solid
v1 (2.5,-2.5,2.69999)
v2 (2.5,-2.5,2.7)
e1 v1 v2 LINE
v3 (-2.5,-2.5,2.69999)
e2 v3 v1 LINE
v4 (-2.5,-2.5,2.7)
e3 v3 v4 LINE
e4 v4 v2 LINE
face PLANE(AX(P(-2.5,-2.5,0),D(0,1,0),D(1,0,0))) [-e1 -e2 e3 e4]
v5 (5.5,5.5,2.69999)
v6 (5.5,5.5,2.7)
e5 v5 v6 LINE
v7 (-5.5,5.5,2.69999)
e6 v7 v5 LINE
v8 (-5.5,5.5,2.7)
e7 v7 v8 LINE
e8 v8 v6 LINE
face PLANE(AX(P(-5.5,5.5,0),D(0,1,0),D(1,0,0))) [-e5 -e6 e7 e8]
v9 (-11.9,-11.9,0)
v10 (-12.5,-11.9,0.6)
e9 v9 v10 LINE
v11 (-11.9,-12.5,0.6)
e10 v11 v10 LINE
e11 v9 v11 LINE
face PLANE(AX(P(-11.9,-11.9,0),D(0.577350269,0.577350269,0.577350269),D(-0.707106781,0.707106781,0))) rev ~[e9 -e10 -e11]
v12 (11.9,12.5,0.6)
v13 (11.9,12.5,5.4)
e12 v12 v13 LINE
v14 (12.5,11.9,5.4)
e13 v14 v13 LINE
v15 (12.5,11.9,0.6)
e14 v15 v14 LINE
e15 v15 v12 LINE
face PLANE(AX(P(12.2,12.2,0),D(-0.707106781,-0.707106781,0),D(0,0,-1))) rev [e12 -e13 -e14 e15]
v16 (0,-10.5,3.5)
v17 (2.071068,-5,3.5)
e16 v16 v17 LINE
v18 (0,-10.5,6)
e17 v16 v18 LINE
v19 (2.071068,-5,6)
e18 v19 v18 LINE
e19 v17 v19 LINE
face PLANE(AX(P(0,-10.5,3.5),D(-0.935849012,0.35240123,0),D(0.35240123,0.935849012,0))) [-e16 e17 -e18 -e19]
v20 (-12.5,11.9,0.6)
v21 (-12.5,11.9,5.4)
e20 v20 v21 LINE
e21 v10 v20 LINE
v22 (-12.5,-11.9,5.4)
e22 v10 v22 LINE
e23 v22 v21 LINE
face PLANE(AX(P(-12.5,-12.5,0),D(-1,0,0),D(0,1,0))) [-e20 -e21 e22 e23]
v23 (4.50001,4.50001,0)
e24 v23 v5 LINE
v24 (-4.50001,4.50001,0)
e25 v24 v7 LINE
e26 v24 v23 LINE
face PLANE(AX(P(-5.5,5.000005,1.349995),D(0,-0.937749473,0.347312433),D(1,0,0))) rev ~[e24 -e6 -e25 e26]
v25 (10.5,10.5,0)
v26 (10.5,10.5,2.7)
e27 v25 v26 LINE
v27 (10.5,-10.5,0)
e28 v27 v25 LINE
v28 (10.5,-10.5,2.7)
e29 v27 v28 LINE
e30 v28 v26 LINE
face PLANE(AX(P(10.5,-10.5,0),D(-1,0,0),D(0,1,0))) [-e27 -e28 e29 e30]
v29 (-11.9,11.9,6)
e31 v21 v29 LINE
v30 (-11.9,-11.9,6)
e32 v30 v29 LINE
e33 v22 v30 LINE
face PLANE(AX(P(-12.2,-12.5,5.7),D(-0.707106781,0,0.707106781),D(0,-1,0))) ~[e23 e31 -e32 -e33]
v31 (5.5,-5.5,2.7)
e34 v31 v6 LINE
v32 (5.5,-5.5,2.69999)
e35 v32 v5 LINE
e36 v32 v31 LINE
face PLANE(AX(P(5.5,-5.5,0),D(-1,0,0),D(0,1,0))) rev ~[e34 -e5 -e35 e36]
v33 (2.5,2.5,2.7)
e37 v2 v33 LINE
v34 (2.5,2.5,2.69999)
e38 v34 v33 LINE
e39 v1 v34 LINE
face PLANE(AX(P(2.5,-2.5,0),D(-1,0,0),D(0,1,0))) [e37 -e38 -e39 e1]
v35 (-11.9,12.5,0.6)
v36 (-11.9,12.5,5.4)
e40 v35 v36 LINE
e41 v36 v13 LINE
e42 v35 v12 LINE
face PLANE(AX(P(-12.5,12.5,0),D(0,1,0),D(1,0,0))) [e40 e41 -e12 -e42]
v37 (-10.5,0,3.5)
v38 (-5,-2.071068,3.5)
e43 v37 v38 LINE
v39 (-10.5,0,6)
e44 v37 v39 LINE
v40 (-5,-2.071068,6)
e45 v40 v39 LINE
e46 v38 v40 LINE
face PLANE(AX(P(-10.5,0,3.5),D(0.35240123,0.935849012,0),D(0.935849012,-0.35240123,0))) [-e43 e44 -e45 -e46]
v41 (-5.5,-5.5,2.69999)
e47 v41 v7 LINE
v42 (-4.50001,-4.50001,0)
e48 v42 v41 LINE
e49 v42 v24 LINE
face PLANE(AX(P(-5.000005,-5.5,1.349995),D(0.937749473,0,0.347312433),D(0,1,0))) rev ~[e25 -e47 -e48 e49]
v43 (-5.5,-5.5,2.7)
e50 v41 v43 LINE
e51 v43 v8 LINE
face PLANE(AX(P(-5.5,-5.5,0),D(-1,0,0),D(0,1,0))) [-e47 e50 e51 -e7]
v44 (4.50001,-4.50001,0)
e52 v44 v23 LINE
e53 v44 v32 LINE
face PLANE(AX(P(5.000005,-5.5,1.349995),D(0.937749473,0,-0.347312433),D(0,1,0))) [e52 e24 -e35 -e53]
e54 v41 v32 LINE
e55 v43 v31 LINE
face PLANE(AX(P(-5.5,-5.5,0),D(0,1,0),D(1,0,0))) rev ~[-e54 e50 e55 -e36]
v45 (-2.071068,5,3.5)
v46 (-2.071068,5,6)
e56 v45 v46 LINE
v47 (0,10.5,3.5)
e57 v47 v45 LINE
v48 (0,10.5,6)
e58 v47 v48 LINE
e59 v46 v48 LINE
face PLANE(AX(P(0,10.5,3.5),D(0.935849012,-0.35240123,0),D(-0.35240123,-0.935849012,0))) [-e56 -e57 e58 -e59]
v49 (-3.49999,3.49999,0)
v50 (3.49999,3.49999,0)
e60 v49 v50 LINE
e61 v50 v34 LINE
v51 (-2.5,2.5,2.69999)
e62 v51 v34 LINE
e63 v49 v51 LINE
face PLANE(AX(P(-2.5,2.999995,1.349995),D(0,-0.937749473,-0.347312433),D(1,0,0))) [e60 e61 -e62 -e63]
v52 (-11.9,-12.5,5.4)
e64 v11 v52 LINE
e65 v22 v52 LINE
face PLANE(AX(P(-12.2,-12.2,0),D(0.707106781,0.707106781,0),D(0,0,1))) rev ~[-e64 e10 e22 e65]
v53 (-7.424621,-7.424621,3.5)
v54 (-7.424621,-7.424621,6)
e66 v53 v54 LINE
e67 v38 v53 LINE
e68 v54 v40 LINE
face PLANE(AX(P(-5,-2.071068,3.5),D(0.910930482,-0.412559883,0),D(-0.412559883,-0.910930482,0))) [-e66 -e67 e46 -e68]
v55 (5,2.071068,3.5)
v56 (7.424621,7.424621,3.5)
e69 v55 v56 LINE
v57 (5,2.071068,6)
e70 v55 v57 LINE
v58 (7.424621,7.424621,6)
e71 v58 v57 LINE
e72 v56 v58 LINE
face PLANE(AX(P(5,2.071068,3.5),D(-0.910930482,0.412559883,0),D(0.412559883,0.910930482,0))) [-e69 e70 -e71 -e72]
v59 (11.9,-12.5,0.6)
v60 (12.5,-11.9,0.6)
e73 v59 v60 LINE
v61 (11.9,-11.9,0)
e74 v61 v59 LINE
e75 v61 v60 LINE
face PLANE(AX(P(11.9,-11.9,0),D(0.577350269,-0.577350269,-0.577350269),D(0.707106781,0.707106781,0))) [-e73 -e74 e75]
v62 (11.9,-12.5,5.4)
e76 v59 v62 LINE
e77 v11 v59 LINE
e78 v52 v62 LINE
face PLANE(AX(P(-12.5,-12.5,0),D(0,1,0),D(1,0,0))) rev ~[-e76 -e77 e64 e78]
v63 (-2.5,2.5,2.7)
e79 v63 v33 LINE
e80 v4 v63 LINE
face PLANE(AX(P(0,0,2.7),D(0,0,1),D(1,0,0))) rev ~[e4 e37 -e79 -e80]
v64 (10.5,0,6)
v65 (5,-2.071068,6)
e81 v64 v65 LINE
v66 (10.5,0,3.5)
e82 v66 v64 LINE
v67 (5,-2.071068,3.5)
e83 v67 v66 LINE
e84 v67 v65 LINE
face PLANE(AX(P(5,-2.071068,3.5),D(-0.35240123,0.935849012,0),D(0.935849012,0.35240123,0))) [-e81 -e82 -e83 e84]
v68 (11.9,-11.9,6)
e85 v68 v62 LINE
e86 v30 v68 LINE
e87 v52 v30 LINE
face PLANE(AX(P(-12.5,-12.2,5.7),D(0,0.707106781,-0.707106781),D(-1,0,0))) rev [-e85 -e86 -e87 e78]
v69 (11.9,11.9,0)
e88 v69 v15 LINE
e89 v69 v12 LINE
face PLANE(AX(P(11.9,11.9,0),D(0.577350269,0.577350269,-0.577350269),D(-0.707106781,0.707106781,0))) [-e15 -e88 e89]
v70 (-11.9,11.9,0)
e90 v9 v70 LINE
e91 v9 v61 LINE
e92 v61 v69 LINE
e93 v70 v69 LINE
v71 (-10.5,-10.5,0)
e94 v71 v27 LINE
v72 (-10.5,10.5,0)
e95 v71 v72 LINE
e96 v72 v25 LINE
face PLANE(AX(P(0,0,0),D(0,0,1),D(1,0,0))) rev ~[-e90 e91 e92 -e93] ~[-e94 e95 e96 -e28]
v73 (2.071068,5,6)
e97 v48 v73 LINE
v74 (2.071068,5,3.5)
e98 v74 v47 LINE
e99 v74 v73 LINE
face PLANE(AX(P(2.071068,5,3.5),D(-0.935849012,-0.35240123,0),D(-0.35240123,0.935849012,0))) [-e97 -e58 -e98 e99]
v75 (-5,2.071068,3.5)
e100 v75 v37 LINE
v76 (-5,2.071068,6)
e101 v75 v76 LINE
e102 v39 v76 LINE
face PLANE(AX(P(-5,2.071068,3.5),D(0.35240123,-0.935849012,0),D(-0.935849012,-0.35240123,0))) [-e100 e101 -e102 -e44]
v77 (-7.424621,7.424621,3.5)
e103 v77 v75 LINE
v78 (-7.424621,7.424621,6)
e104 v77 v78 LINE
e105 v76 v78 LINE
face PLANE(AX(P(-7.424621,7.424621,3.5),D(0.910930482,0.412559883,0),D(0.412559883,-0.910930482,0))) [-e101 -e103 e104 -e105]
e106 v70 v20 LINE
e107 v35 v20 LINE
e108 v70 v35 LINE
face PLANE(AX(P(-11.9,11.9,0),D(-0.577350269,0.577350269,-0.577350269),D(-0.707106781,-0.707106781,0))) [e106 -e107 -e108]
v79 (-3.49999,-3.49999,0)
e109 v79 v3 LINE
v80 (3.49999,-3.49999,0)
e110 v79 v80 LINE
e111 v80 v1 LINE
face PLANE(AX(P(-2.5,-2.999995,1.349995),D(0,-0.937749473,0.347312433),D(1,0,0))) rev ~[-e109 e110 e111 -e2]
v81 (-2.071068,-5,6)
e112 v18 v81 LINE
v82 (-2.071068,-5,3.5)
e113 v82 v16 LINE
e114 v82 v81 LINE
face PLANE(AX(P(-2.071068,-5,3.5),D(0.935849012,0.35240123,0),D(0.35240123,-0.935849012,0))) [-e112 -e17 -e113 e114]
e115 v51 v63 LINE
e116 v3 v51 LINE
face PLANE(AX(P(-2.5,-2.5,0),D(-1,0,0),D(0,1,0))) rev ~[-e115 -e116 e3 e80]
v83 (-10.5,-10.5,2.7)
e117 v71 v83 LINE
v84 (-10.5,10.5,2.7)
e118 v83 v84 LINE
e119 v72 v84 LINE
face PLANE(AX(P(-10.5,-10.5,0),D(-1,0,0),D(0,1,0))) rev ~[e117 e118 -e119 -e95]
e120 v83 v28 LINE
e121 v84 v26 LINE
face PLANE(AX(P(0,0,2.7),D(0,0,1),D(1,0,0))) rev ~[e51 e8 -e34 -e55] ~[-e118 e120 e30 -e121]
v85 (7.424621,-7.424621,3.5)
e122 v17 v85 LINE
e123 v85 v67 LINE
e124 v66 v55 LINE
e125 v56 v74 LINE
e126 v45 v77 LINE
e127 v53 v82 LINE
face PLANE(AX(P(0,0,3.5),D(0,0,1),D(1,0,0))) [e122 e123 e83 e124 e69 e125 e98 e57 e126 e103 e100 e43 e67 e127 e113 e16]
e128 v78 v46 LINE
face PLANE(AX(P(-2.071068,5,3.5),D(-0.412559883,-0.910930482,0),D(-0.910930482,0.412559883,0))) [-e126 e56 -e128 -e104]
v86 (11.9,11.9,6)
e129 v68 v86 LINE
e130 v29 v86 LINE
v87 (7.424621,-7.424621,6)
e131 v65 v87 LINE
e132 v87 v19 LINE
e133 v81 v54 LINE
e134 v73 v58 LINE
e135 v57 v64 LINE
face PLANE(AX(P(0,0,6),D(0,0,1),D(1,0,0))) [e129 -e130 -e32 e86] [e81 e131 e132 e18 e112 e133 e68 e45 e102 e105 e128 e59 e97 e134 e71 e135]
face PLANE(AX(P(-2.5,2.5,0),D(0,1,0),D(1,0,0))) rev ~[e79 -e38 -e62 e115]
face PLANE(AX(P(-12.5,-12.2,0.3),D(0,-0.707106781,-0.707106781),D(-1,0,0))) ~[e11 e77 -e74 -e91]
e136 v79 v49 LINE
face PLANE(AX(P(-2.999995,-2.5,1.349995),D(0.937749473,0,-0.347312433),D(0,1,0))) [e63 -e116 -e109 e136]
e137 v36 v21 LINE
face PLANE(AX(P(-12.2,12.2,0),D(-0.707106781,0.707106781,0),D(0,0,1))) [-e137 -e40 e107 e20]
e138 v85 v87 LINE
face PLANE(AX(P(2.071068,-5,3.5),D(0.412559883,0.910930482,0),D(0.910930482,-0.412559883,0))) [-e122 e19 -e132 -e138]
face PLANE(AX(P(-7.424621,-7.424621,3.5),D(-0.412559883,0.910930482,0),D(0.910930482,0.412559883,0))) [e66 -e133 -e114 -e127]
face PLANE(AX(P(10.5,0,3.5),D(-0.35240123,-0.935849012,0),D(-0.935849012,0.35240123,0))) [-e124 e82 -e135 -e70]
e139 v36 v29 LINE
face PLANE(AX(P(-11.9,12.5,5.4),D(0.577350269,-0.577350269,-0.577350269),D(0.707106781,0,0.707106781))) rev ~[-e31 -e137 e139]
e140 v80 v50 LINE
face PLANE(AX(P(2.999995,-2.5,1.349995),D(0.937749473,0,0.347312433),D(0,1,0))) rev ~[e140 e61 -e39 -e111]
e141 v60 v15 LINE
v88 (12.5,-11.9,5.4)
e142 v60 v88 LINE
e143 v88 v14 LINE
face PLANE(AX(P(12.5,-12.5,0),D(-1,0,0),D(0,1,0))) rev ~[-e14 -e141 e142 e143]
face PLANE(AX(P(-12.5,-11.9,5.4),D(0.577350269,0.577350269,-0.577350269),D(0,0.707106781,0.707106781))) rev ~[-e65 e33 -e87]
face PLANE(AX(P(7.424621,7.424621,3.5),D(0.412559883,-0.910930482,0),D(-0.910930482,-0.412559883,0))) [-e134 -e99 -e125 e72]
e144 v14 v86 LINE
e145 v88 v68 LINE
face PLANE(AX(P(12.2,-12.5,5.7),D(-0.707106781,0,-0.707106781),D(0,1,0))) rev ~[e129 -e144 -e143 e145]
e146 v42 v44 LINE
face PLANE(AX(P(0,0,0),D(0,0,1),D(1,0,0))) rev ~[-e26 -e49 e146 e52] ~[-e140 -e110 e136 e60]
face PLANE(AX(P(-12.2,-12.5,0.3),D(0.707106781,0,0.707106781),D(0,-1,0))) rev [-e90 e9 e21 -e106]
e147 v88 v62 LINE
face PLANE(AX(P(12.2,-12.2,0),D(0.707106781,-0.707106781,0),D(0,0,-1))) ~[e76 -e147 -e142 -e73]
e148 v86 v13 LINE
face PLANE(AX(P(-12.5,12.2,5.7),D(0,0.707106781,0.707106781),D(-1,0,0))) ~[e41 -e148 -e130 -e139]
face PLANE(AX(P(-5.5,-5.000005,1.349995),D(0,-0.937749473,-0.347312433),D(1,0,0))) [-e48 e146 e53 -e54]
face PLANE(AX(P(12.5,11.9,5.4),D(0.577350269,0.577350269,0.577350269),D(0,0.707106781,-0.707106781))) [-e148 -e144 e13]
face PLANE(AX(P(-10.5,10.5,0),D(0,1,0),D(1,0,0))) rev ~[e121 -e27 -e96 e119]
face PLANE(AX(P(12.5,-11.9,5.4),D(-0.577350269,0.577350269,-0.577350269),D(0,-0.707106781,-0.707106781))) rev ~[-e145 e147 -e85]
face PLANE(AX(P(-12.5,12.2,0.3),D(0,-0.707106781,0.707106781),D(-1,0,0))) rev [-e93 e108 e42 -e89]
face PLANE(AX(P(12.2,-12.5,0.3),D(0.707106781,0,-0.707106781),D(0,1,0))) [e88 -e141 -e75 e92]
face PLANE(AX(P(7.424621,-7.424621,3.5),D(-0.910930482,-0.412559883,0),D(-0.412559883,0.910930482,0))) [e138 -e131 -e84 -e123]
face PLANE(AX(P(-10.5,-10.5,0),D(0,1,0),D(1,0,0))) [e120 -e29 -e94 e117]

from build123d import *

# Parameters (mm, degrees)
F0_W     = 25
F0_H     = 25
F1_DEPTH = 6
F2_W     = 21
F2_H     = 21
F2_W_2   = 11
F2_H_2   = 11
F2_W_3   = 5
F2_H_3   = 5
F3_DEPTH = 2.7
F4_START = 3.5
F4_DEPTH = 2.501
F5_SIZE  = 0.6
F6_SIZE2 = 2.69999
F6_SIZE  = 0.99999


# Not quite as in the source:
# - a fillet or chamfer is up to 0.001 mm smaller than in the source, because OpenCascade refuses the exact size


with BuildPart() as f1:
    # F0 (on Top) → F1 (new body)
    with BuildSketch(Plane.XY):
        Rectangle(F0_W, F0_H)
        Polygon((-7.4246212025, 7.4246212025), (-2.0710678119, 5), (0, 10.5), (2.0710678119, 5), (7.4246212025, 7.4246212025), (5, 2.0710678119), (10.5, 0), (5, -2.0710678119), (7.4246212025, -7.4246212025), (2.0710678119, -5), (0, -10.5), (-2.0710678119, -5), (-7.4246212025, -7.4246212025), (-5, -2.0710678119), (-10.5, 0), (-5, 2.0710678119), align=None, mode=Mode.SUBTRACT)
        Polygon((0, 10.5), (-2.0710678119, 5), (-7.4246212025, 7.4246212025), (-5, 2.0710678119), (-10.5, 0), (-5, -2.0710678119), (-7.4246212025, -7.4246212025), (-2.0710678119, -5), (0, -10.5), (2.0710678119, -5), (7.4246212025, -7.4246212025), (5, -2.0710678119), (10.5, 0), (5, 2.0710678119), (7.4246212025, 7.4246212025), (2.0710678119, 5), align=None)
    extrude(amount=F1_DEPTH)

    # F2 (on Top) → F3 (cut)
    with BuildSketch(Plane.XY):
        Rectangle(F2_W, F2_H)
        Rectangle(F2_W_2, F2_H_2, mode=Mode.SUBTRACT)
        Rectangle(F2_W_3, F2_H_3)
    extrude(amount=F3_DEPTH, mode=Mode.SUBTRACT)

    # F0 (on Top) → F4 (cut)
    with BuildSketch(Plane.XY.offset(F4_START)):
        Polygon((0, 10.5), (-2.0710678119, 5), (-7.4246212025, 7.4246212025), (-5, 2.0710678119), (-10.5, 0), (-5, -2.0710678119), (-7.4246212025, -7.4246212025), (-2.0710678119, -5), (0, -10.5), (2.0710678119, -5), (7.4246212025, -7.4246212025), (5, -2.0710678119), (10.5, 0), (5, 2.0710678119), (7.4246212025, 7.4246212025), (2.0710678119, 5), align=None)
    extrude(amount=F4_DEPTH, mode=Mode.SUBTRACT)

    # F5
    f5_edges = [f1.edges().sort_by_distance(p)[0] for p in [
        (0, -12.5, 6),
        (-12.5, -12.5, 3),
        (-12.5, 0, 6),
        (-12.5, 12.5, 3),
        (0, 12.5, 6),
        (12.5, 0, 6),
        (12.5, -12.5, 3),
        (12.5, 12.5, 3),
        (0, -12.5, 0),
        (12.5, 0, 0),
        (0, 12.5, 0),
        (-12.5, 0, 0),
    ]]
    chamfer(f5_edges, length=F5_SIZE)

    # F6 (size 1 and 2.7 in the source; OpenCascade refuses exactly that, so slightly less here)
    f6_edges = [f1.edges().sort_by_distance(p)[0] for p in [
        (-5.5, 0, 0),
        (0, 5.5, 0),
        (5.5, 0, 0),
        (0, -5.5, 0),
        (-2.5, 0, 0),
        (0, -2.5, 0),
        (2.5, 0, 0),
        (0, 2.5, 0),
    ]]
    f6_side = f1.faces().sort_by_distance((-5.344437, 0, 0))[0]
    chamfer(f6_edges, length=F6_SIZE, length2=F6_SIZE2, reference=f6_side)


solid = f1.part
